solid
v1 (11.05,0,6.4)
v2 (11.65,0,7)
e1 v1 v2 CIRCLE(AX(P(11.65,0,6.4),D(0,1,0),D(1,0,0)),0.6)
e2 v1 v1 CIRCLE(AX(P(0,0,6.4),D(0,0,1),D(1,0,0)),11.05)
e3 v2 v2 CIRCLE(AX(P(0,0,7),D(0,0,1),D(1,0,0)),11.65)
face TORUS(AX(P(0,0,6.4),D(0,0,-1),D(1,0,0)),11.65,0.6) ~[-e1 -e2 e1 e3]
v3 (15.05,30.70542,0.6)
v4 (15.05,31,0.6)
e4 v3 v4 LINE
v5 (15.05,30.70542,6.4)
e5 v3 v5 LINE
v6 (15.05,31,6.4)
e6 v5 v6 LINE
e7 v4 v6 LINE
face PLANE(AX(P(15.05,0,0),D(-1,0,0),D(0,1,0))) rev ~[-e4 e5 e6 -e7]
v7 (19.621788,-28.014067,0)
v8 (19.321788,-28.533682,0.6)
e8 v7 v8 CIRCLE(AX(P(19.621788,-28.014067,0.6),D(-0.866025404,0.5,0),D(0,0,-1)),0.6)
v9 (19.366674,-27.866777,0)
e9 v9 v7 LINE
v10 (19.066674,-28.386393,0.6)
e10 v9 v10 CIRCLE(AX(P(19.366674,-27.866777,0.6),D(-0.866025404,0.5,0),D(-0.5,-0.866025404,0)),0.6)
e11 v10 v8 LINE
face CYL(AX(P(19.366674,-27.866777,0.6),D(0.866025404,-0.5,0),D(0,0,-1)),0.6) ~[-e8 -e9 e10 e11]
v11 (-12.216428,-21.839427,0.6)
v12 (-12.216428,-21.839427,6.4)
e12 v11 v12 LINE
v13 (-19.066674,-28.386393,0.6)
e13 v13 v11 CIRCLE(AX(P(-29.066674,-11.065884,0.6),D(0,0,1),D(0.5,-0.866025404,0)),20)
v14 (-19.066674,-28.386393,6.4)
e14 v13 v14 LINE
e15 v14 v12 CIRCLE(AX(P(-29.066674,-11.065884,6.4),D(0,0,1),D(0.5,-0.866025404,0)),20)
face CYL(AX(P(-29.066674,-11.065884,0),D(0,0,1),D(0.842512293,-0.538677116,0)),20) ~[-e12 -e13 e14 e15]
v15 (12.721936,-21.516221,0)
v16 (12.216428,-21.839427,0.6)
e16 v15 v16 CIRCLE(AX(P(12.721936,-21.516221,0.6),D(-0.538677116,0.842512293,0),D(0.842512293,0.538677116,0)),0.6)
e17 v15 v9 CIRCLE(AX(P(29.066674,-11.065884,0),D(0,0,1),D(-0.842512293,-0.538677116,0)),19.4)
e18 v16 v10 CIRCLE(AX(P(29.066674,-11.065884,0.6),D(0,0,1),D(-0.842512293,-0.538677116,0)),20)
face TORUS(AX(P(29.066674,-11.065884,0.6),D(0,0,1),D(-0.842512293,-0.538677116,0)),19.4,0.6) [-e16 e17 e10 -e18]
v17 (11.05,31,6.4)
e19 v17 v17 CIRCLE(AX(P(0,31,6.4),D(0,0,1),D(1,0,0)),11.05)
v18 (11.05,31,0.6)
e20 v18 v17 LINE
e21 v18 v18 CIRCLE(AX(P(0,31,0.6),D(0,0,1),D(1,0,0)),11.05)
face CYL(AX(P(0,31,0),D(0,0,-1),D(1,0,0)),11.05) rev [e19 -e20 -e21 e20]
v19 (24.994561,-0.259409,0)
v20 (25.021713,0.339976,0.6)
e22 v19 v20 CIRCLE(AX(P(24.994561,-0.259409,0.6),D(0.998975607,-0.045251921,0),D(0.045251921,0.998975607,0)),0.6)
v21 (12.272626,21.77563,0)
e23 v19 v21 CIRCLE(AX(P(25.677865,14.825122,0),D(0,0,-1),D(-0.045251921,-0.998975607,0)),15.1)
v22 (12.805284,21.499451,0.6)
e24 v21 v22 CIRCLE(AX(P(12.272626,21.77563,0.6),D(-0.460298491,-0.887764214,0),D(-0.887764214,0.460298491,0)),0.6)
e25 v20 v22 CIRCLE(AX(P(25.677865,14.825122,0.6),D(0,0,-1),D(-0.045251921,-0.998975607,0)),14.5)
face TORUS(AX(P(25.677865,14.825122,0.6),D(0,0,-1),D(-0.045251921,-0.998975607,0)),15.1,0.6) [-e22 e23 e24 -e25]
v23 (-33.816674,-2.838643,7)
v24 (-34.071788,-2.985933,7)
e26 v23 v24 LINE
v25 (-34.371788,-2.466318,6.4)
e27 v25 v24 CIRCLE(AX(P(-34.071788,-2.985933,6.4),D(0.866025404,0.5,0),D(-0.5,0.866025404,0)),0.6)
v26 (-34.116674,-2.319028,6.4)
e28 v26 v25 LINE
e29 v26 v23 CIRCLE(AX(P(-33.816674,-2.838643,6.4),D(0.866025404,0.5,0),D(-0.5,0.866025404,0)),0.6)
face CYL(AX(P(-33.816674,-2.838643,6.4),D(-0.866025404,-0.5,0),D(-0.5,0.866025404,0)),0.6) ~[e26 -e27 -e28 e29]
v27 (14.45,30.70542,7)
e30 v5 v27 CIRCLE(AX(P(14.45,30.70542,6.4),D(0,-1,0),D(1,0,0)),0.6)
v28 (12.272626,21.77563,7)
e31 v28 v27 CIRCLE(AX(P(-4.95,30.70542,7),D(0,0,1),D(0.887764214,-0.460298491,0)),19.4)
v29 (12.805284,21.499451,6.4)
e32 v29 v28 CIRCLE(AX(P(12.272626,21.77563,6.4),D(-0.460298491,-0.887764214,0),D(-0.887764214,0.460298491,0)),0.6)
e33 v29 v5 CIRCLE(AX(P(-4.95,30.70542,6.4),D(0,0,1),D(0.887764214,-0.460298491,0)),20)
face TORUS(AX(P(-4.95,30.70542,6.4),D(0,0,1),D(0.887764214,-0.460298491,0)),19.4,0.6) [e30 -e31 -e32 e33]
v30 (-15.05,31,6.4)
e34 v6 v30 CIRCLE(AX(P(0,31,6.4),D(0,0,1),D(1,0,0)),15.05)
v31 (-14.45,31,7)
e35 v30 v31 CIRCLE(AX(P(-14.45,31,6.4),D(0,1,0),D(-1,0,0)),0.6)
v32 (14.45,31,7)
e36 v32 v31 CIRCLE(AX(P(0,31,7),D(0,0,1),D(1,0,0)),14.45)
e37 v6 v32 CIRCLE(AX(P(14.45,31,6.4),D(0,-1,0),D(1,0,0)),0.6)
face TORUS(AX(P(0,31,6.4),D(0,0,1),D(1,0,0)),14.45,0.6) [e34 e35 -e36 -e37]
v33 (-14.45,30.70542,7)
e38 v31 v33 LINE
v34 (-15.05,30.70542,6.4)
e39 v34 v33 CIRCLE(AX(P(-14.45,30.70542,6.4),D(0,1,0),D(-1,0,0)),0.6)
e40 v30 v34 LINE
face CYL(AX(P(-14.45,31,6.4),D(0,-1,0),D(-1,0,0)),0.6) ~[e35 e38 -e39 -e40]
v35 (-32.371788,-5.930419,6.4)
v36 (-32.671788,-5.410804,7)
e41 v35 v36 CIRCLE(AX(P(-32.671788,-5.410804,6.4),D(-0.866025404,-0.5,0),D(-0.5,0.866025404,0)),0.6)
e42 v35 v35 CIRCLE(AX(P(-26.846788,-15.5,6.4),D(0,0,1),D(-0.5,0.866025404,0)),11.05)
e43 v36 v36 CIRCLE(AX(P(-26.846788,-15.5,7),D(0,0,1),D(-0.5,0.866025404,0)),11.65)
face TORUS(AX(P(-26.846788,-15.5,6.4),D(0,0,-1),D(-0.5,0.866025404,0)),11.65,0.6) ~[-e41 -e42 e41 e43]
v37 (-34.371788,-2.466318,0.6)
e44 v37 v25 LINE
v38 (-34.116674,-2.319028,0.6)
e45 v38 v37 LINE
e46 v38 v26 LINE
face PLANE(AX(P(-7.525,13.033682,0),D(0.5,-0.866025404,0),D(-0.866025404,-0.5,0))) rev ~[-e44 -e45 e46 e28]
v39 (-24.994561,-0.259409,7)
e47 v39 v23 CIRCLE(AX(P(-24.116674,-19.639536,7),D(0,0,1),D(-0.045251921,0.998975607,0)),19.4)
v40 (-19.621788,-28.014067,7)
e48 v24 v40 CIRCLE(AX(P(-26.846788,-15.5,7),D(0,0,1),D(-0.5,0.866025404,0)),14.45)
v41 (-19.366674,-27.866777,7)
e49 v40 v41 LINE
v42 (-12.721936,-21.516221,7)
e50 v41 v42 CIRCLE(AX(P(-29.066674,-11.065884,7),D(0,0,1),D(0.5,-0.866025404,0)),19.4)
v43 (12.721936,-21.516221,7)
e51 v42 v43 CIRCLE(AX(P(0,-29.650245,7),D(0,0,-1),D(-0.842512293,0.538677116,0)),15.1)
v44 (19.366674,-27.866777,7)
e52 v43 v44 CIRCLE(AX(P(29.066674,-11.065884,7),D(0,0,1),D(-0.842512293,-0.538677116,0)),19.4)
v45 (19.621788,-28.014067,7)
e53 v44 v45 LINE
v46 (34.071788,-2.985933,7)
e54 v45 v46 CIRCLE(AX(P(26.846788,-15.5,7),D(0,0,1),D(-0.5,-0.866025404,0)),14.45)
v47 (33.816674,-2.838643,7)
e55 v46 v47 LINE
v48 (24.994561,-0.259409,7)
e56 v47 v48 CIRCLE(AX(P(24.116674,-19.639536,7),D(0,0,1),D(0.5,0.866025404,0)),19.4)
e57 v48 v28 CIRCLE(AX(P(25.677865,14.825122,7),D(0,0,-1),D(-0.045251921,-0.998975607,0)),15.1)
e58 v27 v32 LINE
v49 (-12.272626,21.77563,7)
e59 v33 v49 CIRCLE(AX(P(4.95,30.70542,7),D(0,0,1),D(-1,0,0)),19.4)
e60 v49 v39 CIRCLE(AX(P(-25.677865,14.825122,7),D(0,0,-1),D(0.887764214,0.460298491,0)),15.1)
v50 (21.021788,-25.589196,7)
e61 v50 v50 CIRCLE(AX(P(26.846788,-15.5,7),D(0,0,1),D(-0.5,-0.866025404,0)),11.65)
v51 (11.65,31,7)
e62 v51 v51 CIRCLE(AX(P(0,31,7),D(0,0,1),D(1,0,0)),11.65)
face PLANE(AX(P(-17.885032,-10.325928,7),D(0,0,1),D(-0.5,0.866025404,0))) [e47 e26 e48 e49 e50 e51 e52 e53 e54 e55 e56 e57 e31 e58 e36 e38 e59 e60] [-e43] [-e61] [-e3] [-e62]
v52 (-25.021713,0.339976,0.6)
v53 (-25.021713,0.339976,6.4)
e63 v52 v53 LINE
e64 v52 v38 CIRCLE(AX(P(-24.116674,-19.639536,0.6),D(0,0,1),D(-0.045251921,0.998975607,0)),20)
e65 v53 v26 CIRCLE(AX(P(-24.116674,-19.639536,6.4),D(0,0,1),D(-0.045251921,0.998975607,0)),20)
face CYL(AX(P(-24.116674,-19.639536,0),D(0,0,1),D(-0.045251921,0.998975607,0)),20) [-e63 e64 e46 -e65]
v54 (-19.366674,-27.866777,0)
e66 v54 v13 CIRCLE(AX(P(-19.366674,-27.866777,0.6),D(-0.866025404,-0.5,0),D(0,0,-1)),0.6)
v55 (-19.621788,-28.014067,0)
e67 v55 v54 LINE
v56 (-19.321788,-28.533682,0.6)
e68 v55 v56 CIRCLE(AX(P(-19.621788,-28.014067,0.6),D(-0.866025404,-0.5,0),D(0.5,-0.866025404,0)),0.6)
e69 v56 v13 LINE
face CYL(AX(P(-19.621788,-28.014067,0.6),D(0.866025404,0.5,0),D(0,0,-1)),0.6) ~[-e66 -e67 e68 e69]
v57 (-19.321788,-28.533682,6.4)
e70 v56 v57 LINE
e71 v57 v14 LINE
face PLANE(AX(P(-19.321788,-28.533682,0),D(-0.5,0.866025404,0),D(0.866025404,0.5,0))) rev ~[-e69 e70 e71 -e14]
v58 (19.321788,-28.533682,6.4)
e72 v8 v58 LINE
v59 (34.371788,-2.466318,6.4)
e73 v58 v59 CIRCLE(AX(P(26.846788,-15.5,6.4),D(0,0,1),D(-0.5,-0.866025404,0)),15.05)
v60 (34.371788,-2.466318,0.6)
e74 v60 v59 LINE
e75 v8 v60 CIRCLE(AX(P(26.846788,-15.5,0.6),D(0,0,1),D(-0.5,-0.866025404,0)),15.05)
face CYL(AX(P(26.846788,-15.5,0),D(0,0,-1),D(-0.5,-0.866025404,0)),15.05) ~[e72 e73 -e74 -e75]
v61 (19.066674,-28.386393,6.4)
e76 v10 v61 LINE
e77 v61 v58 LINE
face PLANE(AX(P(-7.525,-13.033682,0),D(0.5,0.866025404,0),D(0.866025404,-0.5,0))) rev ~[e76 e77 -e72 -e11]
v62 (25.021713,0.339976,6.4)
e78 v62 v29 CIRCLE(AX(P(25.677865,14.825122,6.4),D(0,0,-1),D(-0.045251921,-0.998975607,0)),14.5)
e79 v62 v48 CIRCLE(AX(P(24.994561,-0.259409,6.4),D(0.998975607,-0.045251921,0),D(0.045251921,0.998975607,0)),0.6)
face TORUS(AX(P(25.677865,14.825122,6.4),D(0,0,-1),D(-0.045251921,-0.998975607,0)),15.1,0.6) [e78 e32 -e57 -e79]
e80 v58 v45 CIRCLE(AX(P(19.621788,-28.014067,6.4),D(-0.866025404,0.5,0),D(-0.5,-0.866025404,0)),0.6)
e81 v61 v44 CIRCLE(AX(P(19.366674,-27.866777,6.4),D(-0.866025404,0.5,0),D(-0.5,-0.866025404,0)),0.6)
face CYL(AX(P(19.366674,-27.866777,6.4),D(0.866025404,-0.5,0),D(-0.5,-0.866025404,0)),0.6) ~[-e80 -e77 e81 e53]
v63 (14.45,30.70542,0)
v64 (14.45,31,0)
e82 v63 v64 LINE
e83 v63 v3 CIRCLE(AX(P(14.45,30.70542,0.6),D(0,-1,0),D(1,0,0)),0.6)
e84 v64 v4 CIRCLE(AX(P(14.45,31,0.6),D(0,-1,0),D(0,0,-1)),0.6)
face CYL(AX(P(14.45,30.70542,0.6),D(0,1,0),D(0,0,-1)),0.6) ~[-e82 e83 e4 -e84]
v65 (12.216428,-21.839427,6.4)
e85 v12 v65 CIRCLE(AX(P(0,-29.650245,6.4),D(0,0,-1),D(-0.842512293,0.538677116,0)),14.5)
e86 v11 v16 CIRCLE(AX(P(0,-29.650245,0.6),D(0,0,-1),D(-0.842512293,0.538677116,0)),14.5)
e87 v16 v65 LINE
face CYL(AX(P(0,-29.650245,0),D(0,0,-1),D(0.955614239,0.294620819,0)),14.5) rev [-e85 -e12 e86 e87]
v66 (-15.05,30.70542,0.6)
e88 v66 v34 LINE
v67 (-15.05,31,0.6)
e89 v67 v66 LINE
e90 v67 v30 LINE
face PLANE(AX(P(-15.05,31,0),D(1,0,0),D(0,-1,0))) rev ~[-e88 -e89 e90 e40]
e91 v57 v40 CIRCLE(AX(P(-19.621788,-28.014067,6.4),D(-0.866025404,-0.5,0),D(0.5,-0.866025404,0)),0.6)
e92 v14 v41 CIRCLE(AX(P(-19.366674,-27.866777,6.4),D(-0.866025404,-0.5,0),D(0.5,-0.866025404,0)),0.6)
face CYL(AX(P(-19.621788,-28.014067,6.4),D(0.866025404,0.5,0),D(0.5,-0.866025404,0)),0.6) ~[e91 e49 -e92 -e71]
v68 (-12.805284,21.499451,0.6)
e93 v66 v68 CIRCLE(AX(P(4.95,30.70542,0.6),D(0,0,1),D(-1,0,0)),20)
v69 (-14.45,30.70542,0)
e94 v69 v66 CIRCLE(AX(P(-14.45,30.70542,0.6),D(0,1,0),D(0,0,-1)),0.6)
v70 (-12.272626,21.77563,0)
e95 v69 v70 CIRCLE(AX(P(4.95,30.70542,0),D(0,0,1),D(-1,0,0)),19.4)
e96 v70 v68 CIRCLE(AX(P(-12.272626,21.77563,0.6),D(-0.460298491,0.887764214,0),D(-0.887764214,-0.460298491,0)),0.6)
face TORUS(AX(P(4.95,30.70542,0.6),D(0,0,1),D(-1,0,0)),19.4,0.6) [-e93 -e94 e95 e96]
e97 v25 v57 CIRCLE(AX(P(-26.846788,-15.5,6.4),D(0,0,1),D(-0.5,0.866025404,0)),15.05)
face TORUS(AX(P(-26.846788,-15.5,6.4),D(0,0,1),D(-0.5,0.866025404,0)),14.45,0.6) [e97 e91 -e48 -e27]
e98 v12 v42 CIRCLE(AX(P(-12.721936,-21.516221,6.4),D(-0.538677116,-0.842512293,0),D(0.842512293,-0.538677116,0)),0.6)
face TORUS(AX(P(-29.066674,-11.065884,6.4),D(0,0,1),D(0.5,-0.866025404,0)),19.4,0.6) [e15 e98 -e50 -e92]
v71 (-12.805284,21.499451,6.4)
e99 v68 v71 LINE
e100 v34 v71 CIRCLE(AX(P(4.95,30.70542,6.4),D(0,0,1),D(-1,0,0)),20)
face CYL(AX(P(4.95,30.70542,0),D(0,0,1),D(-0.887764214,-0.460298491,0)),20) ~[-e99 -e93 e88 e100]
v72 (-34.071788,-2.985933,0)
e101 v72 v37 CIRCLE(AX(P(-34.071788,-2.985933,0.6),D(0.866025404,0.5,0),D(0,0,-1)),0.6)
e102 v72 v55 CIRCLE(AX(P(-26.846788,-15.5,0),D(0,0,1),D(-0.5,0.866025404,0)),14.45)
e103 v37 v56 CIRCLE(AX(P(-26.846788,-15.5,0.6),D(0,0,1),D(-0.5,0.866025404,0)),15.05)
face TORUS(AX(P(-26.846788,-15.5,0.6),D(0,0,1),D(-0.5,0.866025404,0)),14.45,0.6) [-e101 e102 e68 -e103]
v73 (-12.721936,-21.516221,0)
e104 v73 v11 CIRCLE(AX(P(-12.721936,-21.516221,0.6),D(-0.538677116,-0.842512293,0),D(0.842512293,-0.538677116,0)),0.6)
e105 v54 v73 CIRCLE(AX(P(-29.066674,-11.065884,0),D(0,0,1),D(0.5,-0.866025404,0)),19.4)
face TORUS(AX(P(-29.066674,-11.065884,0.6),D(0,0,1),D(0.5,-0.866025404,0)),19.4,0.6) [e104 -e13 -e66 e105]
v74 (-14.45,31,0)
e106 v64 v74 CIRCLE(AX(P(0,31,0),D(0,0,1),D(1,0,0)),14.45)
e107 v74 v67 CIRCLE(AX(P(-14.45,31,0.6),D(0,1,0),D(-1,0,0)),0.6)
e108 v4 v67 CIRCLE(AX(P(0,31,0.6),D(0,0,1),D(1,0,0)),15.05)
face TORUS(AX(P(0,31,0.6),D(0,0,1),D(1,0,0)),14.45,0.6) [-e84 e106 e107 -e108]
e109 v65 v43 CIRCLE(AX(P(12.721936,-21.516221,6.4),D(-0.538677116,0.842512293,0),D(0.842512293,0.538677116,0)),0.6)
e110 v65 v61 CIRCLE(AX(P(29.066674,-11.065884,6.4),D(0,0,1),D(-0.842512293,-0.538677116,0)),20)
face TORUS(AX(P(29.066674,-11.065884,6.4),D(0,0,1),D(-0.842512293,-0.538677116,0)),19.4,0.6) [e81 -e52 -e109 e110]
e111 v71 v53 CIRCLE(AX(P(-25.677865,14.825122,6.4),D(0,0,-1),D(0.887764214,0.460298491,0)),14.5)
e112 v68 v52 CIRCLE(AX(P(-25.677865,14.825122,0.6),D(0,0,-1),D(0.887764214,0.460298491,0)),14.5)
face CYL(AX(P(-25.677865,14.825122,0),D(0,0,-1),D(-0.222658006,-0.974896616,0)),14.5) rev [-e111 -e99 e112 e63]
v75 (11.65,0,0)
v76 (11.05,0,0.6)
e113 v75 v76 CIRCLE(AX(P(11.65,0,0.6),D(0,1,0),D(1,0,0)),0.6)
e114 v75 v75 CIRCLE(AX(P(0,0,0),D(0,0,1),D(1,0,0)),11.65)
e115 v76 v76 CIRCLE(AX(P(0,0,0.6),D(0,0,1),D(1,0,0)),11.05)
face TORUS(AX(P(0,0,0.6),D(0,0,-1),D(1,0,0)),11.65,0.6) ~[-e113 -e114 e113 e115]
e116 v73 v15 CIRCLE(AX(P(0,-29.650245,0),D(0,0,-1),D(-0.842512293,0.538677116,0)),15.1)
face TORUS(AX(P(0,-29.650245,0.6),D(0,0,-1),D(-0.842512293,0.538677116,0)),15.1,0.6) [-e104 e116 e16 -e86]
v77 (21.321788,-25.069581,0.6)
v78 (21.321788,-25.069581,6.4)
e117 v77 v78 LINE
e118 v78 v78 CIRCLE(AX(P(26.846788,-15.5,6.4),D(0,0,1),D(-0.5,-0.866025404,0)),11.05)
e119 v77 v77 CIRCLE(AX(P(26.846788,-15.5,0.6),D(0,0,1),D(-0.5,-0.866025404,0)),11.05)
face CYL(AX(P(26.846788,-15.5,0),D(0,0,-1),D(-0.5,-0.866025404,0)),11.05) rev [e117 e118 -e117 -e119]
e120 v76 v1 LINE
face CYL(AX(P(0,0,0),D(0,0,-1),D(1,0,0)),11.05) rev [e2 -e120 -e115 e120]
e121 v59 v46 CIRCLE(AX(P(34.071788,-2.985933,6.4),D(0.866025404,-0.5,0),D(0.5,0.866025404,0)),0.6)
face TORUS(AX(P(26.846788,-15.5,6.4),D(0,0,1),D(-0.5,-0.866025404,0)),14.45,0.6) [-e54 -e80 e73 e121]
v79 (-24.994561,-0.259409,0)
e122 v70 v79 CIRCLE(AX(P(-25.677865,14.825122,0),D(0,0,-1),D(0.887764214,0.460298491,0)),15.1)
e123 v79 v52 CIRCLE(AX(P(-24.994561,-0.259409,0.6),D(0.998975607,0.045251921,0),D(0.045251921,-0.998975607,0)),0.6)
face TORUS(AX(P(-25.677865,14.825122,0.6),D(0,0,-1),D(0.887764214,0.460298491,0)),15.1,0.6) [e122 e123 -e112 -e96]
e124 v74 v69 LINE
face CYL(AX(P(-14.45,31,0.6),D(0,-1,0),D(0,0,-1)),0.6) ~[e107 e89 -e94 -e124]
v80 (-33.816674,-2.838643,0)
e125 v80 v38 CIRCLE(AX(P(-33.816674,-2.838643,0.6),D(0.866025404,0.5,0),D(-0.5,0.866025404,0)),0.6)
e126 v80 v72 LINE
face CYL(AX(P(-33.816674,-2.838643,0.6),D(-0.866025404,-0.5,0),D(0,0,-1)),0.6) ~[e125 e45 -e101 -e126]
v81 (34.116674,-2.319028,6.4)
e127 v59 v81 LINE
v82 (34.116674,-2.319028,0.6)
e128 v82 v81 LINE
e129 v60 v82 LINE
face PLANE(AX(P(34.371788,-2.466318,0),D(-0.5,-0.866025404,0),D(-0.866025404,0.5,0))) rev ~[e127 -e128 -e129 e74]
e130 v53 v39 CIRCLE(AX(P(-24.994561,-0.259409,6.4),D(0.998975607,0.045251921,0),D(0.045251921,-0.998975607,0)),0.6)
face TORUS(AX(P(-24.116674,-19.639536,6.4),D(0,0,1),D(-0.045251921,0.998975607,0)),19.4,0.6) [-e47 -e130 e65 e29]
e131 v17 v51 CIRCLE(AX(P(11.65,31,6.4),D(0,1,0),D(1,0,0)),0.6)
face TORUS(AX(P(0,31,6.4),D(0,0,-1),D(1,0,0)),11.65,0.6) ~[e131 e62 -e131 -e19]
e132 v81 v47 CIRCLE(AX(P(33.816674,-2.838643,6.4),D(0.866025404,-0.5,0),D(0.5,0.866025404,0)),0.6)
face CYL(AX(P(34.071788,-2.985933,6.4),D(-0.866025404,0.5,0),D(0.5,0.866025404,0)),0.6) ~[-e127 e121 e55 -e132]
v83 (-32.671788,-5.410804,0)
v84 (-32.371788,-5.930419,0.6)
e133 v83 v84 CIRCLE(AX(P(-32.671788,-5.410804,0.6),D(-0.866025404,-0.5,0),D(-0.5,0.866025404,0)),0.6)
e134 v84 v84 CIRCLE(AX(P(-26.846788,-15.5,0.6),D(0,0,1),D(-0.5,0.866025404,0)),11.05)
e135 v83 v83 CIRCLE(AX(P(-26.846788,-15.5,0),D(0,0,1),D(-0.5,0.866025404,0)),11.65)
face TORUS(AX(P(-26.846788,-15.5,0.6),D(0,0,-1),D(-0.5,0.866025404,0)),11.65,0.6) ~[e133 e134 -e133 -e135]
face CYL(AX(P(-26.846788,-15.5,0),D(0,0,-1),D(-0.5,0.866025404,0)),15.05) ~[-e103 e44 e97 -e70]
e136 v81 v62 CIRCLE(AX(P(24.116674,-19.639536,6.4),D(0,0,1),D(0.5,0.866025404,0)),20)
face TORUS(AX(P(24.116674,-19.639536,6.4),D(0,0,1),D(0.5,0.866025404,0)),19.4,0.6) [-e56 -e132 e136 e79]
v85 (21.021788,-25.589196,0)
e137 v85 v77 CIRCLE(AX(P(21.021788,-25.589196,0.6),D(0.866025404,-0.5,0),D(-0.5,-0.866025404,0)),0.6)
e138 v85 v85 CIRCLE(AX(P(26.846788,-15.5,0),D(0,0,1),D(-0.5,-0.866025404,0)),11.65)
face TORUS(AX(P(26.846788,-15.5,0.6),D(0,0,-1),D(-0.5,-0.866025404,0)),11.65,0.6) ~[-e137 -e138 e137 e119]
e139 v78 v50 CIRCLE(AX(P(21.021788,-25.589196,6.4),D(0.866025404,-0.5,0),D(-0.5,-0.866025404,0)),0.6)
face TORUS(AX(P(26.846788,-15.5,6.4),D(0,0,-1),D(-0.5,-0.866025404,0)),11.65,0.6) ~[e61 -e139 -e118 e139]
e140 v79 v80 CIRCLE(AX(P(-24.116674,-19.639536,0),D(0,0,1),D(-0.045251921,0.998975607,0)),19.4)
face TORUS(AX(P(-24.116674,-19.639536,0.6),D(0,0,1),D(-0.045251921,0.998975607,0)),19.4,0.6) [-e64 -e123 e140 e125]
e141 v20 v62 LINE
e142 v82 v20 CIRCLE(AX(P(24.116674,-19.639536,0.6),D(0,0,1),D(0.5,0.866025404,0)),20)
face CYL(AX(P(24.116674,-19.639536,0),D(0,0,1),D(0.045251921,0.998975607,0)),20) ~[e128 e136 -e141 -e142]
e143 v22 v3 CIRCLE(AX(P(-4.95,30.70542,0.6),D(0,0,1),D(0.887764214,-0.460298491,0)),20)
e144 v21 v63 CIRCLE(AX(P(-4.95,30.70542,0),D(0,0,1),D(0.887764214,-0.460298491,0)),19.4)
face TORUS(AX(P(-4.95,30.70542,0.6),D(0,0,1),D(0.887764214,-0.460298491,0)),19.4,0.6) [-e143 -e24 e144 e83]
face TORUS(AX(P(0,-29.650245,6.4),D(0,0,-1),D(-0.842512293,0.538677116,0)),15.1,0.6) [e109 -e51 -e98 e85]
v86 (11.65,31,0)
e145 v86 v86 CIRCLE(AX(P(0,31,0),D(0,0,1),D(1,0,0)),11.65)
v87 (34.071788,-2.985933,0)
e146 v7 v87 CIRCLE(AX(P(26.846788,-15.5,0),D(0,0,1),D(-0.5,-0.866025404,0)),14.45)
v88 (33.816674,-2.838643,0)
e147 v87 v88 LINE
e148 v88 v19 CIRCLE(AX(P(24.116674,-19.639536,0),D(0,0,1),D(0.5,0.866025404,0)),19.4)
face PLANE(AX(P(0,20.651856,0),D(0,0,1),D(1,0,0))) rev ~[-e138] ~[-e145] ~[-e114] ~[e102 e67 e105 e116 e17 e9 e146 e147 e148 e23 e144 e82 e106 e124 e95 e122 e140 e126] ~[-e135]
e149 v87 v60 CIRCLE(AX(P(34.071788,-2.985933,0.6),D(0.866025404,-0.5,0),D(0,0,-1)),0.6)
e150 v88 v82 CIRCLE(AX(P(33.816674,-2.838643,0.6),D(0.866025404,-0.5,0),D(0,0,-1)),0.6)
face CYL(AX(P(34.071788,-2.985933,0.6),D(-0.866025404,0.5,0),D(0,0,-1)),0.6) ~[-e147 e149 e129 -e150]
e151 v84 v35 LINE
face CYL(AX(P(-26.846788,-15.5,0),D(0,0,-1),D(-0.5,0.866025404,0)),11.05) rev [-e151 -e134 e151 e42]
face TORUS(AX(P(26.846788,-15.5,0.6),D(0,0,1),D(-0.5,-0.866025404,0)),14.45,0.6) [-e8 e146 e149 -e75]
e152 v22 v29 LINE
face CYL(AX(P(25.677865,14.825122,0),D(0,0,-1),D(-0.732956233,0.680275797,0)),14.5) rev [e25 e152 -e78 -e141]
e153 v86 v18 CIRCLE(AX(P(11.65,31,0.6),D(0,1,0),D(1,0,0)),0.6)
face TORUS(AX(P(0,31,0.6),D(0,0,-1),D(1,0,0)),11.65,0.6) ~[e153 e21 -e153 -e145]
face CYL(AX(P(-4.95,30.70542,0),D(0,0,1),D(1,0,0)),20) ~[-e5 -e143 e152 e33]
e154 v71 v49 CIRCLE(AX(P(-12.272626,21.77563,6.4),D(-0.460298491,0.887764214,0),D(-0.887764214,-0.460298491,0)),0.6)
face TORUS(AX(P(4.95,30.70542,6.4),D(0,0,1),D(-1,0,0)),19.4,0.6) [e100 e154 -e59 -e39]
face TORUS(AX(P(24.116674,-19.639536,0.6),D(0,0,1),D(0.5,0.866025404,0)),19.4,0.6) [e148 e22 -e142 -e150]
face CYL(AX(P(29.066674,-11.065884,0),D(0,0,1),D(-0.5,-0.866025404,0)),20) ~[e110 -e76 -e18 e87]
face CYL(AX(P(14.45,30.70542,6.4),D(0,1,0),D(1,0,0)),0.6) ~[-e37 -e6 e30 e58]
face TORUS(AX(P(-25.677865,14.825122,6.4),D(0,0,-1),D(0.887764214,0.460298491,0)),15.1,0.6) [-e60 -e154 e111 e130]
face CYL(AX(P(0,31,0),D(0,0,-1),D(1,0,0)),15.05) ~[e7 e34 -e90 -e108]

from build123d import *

# Parameters (mm, degrees)
F0_R            = 15.05
F0_R_2          = 11.05
F1_DEPTH        = 7
F2_R            = 11.05
F3_DEPTH        = 7
F3_COPIES_COUNT = 3
F5_DEPTH        = 118
F5_COPIES_COUNT = 3
F6_R            = 20
F7_R            = 0.6


# Not quite as in the source:
# - an extrude ends at something that could not be found from the text; its depth is read off the source's solid
# - a pattern or mirror of a feature is missing from the dataset's text; its kind, count and spacing are read off the source's solid


with BuildPart() as f1:
    # F0 (on Top) → F1 (new body)
    with BuildSketch(Plane.XY):
        Circle(F0_R)
        Circle(F0_R_2, mode=Mode.SUBTRACT)
    extrude(amount=F1_DEPTH)

    # F2 (on Top) → F3 (join, through all)
    with BuildSketch(Plane.XY):
        with BuildLine():
            Line((15.05, 0), (15.05, 31))
            ThreePointArc((15.05, 31), (0, 46.05), (-15.05, 31))
            Line((-15.05, 31), (-15.05, 0))
            ThreePointArc((-15.05, 0), (0, 15.05), (15.05, 0))
        make_face()
        with Locations((0, 31)):
            Circle(F2_R, mode=Mode.SUBTRACT)
    f3 = extrude(amount=F3_DEPTH)

    # F3_copies: F3 ×3 about axis
    f3_copies_axis = Axis((0, 0, 0), (0, 0, 1))
    for i in range(1, F3_COPIES_COUNT):
        add(f3.rotate(f3_copies_axis, i * 360 / F3_COPIES_COUNT))

    # F4 (on Top) → F5 (cut, through all)
    with BuildSketch(Plane.XY):
        with BuildLine():
            Line((15.05, 8.6891215513), (15.05, 24.6891215513))
            ThreePointArc((15.05, 24.6891215513), (13.1204970221, 7.5751224876), (28.9064064606, 0.6891215513))
            Line((28.9064064606, 0.6891215513), (15.05, 8.6891215513))
        make_face()
    f5 = extrude(amount=F5_DEPTH, mode=Mode.SUBTRACT)

    # F5_copies: F5 ×3 about axis
    f5_copies_axis = Axis((0, 0, 0), (0, 0, 1))
    for i in range(1, F5_COPIES_COUNT):
        add(f5.rotate(f5_copies_axis, i * 360 / F5_COPIES_COUNT), mode=Mode.SUBTRACT)

    # F6
    f6_edges = [f1.edges().sort_by_distance(p)[0] for p in [
        (15.05, 24.689122, 3.5),
        (28.906406, 0.689122, 3.5),
        (13.856406, -25.378243, 3.5),
        (-13.856406, -25.378243, 3.5),
        (-28.906406, 0.689122, 3.5),
        (-15.05, 24.689122, 3.5),
    ]]
    fillet(f6_edges, radius=F6_R)

    # F7
    f7_edges = [f1.edges().sort_by_distance(p)[0] for p in [
        (-11.05, 31, 7),
        (-11.05, 0, 7),
        (-11.05, 0, 0),
        (-11.05, 31, 0),
        (34.244231, -2.392673, 7),
        (29.728941, -0.443118, 7),
        (39.88047, -23.025, 7),
        (13.120497, 7.575122, 7),
        (19.194231, -28.460037, 7),
        (14.480719, 25.967577, 7),
        (15.248222, -25.524459, 7),
        (15.05, 30.85271, 7),
        (0, -15.150245, 7),
        (0, 46.05, 7),
        (-15.248222, -25.524459, 7),
        (-15.05, 30.85271, 7),
        (-19.194231, -28.460037, 7),
        (-14.480719, 25.967577, 7),
        (-39.88047, -23.025, 7),
        (-13.120497, 7.575122, 7),
        (-34.244231, -2.392673, 7),
        (-29.728941, -0.443118, 7),
        (-21.321788, -25.069581, 7),
        (32.371788, -5.930419, 7),
        (34.244231, -2.392673, 0),
        (29.728941, -0.443118, 0),
        (39.88047, -23.025, 0),
        (13.120497, 7.575122, 0),
        (19.194231, -28.460037, 0),
        (14.480719, 25.967577, 0),
        (15.248222, -25.524459, 0),
        (15.05, 30.85271, 0),
        (0, -15.150245, 0),
        (0, 46.05, 0),
        (-15.248222, -25.524459, 0),
        (-15.05, 30.85271, 0),
        (-19.194231, -28.460037, 0),
        (-14.480719, 25.967577, 0),
        (-39.88047, -23.025, 0),
        (-13.120497, 7.575122, 0),
        (-34.244231, -2.392673, 0),
        (-29.728941, -0.443118, 0),
        (-21.321788, -25.069581, 0),
        (32.371788, -5.930419, 0),
    ]]
    fillet(f7_edges, radius=F7_R)


solid = f1.part
